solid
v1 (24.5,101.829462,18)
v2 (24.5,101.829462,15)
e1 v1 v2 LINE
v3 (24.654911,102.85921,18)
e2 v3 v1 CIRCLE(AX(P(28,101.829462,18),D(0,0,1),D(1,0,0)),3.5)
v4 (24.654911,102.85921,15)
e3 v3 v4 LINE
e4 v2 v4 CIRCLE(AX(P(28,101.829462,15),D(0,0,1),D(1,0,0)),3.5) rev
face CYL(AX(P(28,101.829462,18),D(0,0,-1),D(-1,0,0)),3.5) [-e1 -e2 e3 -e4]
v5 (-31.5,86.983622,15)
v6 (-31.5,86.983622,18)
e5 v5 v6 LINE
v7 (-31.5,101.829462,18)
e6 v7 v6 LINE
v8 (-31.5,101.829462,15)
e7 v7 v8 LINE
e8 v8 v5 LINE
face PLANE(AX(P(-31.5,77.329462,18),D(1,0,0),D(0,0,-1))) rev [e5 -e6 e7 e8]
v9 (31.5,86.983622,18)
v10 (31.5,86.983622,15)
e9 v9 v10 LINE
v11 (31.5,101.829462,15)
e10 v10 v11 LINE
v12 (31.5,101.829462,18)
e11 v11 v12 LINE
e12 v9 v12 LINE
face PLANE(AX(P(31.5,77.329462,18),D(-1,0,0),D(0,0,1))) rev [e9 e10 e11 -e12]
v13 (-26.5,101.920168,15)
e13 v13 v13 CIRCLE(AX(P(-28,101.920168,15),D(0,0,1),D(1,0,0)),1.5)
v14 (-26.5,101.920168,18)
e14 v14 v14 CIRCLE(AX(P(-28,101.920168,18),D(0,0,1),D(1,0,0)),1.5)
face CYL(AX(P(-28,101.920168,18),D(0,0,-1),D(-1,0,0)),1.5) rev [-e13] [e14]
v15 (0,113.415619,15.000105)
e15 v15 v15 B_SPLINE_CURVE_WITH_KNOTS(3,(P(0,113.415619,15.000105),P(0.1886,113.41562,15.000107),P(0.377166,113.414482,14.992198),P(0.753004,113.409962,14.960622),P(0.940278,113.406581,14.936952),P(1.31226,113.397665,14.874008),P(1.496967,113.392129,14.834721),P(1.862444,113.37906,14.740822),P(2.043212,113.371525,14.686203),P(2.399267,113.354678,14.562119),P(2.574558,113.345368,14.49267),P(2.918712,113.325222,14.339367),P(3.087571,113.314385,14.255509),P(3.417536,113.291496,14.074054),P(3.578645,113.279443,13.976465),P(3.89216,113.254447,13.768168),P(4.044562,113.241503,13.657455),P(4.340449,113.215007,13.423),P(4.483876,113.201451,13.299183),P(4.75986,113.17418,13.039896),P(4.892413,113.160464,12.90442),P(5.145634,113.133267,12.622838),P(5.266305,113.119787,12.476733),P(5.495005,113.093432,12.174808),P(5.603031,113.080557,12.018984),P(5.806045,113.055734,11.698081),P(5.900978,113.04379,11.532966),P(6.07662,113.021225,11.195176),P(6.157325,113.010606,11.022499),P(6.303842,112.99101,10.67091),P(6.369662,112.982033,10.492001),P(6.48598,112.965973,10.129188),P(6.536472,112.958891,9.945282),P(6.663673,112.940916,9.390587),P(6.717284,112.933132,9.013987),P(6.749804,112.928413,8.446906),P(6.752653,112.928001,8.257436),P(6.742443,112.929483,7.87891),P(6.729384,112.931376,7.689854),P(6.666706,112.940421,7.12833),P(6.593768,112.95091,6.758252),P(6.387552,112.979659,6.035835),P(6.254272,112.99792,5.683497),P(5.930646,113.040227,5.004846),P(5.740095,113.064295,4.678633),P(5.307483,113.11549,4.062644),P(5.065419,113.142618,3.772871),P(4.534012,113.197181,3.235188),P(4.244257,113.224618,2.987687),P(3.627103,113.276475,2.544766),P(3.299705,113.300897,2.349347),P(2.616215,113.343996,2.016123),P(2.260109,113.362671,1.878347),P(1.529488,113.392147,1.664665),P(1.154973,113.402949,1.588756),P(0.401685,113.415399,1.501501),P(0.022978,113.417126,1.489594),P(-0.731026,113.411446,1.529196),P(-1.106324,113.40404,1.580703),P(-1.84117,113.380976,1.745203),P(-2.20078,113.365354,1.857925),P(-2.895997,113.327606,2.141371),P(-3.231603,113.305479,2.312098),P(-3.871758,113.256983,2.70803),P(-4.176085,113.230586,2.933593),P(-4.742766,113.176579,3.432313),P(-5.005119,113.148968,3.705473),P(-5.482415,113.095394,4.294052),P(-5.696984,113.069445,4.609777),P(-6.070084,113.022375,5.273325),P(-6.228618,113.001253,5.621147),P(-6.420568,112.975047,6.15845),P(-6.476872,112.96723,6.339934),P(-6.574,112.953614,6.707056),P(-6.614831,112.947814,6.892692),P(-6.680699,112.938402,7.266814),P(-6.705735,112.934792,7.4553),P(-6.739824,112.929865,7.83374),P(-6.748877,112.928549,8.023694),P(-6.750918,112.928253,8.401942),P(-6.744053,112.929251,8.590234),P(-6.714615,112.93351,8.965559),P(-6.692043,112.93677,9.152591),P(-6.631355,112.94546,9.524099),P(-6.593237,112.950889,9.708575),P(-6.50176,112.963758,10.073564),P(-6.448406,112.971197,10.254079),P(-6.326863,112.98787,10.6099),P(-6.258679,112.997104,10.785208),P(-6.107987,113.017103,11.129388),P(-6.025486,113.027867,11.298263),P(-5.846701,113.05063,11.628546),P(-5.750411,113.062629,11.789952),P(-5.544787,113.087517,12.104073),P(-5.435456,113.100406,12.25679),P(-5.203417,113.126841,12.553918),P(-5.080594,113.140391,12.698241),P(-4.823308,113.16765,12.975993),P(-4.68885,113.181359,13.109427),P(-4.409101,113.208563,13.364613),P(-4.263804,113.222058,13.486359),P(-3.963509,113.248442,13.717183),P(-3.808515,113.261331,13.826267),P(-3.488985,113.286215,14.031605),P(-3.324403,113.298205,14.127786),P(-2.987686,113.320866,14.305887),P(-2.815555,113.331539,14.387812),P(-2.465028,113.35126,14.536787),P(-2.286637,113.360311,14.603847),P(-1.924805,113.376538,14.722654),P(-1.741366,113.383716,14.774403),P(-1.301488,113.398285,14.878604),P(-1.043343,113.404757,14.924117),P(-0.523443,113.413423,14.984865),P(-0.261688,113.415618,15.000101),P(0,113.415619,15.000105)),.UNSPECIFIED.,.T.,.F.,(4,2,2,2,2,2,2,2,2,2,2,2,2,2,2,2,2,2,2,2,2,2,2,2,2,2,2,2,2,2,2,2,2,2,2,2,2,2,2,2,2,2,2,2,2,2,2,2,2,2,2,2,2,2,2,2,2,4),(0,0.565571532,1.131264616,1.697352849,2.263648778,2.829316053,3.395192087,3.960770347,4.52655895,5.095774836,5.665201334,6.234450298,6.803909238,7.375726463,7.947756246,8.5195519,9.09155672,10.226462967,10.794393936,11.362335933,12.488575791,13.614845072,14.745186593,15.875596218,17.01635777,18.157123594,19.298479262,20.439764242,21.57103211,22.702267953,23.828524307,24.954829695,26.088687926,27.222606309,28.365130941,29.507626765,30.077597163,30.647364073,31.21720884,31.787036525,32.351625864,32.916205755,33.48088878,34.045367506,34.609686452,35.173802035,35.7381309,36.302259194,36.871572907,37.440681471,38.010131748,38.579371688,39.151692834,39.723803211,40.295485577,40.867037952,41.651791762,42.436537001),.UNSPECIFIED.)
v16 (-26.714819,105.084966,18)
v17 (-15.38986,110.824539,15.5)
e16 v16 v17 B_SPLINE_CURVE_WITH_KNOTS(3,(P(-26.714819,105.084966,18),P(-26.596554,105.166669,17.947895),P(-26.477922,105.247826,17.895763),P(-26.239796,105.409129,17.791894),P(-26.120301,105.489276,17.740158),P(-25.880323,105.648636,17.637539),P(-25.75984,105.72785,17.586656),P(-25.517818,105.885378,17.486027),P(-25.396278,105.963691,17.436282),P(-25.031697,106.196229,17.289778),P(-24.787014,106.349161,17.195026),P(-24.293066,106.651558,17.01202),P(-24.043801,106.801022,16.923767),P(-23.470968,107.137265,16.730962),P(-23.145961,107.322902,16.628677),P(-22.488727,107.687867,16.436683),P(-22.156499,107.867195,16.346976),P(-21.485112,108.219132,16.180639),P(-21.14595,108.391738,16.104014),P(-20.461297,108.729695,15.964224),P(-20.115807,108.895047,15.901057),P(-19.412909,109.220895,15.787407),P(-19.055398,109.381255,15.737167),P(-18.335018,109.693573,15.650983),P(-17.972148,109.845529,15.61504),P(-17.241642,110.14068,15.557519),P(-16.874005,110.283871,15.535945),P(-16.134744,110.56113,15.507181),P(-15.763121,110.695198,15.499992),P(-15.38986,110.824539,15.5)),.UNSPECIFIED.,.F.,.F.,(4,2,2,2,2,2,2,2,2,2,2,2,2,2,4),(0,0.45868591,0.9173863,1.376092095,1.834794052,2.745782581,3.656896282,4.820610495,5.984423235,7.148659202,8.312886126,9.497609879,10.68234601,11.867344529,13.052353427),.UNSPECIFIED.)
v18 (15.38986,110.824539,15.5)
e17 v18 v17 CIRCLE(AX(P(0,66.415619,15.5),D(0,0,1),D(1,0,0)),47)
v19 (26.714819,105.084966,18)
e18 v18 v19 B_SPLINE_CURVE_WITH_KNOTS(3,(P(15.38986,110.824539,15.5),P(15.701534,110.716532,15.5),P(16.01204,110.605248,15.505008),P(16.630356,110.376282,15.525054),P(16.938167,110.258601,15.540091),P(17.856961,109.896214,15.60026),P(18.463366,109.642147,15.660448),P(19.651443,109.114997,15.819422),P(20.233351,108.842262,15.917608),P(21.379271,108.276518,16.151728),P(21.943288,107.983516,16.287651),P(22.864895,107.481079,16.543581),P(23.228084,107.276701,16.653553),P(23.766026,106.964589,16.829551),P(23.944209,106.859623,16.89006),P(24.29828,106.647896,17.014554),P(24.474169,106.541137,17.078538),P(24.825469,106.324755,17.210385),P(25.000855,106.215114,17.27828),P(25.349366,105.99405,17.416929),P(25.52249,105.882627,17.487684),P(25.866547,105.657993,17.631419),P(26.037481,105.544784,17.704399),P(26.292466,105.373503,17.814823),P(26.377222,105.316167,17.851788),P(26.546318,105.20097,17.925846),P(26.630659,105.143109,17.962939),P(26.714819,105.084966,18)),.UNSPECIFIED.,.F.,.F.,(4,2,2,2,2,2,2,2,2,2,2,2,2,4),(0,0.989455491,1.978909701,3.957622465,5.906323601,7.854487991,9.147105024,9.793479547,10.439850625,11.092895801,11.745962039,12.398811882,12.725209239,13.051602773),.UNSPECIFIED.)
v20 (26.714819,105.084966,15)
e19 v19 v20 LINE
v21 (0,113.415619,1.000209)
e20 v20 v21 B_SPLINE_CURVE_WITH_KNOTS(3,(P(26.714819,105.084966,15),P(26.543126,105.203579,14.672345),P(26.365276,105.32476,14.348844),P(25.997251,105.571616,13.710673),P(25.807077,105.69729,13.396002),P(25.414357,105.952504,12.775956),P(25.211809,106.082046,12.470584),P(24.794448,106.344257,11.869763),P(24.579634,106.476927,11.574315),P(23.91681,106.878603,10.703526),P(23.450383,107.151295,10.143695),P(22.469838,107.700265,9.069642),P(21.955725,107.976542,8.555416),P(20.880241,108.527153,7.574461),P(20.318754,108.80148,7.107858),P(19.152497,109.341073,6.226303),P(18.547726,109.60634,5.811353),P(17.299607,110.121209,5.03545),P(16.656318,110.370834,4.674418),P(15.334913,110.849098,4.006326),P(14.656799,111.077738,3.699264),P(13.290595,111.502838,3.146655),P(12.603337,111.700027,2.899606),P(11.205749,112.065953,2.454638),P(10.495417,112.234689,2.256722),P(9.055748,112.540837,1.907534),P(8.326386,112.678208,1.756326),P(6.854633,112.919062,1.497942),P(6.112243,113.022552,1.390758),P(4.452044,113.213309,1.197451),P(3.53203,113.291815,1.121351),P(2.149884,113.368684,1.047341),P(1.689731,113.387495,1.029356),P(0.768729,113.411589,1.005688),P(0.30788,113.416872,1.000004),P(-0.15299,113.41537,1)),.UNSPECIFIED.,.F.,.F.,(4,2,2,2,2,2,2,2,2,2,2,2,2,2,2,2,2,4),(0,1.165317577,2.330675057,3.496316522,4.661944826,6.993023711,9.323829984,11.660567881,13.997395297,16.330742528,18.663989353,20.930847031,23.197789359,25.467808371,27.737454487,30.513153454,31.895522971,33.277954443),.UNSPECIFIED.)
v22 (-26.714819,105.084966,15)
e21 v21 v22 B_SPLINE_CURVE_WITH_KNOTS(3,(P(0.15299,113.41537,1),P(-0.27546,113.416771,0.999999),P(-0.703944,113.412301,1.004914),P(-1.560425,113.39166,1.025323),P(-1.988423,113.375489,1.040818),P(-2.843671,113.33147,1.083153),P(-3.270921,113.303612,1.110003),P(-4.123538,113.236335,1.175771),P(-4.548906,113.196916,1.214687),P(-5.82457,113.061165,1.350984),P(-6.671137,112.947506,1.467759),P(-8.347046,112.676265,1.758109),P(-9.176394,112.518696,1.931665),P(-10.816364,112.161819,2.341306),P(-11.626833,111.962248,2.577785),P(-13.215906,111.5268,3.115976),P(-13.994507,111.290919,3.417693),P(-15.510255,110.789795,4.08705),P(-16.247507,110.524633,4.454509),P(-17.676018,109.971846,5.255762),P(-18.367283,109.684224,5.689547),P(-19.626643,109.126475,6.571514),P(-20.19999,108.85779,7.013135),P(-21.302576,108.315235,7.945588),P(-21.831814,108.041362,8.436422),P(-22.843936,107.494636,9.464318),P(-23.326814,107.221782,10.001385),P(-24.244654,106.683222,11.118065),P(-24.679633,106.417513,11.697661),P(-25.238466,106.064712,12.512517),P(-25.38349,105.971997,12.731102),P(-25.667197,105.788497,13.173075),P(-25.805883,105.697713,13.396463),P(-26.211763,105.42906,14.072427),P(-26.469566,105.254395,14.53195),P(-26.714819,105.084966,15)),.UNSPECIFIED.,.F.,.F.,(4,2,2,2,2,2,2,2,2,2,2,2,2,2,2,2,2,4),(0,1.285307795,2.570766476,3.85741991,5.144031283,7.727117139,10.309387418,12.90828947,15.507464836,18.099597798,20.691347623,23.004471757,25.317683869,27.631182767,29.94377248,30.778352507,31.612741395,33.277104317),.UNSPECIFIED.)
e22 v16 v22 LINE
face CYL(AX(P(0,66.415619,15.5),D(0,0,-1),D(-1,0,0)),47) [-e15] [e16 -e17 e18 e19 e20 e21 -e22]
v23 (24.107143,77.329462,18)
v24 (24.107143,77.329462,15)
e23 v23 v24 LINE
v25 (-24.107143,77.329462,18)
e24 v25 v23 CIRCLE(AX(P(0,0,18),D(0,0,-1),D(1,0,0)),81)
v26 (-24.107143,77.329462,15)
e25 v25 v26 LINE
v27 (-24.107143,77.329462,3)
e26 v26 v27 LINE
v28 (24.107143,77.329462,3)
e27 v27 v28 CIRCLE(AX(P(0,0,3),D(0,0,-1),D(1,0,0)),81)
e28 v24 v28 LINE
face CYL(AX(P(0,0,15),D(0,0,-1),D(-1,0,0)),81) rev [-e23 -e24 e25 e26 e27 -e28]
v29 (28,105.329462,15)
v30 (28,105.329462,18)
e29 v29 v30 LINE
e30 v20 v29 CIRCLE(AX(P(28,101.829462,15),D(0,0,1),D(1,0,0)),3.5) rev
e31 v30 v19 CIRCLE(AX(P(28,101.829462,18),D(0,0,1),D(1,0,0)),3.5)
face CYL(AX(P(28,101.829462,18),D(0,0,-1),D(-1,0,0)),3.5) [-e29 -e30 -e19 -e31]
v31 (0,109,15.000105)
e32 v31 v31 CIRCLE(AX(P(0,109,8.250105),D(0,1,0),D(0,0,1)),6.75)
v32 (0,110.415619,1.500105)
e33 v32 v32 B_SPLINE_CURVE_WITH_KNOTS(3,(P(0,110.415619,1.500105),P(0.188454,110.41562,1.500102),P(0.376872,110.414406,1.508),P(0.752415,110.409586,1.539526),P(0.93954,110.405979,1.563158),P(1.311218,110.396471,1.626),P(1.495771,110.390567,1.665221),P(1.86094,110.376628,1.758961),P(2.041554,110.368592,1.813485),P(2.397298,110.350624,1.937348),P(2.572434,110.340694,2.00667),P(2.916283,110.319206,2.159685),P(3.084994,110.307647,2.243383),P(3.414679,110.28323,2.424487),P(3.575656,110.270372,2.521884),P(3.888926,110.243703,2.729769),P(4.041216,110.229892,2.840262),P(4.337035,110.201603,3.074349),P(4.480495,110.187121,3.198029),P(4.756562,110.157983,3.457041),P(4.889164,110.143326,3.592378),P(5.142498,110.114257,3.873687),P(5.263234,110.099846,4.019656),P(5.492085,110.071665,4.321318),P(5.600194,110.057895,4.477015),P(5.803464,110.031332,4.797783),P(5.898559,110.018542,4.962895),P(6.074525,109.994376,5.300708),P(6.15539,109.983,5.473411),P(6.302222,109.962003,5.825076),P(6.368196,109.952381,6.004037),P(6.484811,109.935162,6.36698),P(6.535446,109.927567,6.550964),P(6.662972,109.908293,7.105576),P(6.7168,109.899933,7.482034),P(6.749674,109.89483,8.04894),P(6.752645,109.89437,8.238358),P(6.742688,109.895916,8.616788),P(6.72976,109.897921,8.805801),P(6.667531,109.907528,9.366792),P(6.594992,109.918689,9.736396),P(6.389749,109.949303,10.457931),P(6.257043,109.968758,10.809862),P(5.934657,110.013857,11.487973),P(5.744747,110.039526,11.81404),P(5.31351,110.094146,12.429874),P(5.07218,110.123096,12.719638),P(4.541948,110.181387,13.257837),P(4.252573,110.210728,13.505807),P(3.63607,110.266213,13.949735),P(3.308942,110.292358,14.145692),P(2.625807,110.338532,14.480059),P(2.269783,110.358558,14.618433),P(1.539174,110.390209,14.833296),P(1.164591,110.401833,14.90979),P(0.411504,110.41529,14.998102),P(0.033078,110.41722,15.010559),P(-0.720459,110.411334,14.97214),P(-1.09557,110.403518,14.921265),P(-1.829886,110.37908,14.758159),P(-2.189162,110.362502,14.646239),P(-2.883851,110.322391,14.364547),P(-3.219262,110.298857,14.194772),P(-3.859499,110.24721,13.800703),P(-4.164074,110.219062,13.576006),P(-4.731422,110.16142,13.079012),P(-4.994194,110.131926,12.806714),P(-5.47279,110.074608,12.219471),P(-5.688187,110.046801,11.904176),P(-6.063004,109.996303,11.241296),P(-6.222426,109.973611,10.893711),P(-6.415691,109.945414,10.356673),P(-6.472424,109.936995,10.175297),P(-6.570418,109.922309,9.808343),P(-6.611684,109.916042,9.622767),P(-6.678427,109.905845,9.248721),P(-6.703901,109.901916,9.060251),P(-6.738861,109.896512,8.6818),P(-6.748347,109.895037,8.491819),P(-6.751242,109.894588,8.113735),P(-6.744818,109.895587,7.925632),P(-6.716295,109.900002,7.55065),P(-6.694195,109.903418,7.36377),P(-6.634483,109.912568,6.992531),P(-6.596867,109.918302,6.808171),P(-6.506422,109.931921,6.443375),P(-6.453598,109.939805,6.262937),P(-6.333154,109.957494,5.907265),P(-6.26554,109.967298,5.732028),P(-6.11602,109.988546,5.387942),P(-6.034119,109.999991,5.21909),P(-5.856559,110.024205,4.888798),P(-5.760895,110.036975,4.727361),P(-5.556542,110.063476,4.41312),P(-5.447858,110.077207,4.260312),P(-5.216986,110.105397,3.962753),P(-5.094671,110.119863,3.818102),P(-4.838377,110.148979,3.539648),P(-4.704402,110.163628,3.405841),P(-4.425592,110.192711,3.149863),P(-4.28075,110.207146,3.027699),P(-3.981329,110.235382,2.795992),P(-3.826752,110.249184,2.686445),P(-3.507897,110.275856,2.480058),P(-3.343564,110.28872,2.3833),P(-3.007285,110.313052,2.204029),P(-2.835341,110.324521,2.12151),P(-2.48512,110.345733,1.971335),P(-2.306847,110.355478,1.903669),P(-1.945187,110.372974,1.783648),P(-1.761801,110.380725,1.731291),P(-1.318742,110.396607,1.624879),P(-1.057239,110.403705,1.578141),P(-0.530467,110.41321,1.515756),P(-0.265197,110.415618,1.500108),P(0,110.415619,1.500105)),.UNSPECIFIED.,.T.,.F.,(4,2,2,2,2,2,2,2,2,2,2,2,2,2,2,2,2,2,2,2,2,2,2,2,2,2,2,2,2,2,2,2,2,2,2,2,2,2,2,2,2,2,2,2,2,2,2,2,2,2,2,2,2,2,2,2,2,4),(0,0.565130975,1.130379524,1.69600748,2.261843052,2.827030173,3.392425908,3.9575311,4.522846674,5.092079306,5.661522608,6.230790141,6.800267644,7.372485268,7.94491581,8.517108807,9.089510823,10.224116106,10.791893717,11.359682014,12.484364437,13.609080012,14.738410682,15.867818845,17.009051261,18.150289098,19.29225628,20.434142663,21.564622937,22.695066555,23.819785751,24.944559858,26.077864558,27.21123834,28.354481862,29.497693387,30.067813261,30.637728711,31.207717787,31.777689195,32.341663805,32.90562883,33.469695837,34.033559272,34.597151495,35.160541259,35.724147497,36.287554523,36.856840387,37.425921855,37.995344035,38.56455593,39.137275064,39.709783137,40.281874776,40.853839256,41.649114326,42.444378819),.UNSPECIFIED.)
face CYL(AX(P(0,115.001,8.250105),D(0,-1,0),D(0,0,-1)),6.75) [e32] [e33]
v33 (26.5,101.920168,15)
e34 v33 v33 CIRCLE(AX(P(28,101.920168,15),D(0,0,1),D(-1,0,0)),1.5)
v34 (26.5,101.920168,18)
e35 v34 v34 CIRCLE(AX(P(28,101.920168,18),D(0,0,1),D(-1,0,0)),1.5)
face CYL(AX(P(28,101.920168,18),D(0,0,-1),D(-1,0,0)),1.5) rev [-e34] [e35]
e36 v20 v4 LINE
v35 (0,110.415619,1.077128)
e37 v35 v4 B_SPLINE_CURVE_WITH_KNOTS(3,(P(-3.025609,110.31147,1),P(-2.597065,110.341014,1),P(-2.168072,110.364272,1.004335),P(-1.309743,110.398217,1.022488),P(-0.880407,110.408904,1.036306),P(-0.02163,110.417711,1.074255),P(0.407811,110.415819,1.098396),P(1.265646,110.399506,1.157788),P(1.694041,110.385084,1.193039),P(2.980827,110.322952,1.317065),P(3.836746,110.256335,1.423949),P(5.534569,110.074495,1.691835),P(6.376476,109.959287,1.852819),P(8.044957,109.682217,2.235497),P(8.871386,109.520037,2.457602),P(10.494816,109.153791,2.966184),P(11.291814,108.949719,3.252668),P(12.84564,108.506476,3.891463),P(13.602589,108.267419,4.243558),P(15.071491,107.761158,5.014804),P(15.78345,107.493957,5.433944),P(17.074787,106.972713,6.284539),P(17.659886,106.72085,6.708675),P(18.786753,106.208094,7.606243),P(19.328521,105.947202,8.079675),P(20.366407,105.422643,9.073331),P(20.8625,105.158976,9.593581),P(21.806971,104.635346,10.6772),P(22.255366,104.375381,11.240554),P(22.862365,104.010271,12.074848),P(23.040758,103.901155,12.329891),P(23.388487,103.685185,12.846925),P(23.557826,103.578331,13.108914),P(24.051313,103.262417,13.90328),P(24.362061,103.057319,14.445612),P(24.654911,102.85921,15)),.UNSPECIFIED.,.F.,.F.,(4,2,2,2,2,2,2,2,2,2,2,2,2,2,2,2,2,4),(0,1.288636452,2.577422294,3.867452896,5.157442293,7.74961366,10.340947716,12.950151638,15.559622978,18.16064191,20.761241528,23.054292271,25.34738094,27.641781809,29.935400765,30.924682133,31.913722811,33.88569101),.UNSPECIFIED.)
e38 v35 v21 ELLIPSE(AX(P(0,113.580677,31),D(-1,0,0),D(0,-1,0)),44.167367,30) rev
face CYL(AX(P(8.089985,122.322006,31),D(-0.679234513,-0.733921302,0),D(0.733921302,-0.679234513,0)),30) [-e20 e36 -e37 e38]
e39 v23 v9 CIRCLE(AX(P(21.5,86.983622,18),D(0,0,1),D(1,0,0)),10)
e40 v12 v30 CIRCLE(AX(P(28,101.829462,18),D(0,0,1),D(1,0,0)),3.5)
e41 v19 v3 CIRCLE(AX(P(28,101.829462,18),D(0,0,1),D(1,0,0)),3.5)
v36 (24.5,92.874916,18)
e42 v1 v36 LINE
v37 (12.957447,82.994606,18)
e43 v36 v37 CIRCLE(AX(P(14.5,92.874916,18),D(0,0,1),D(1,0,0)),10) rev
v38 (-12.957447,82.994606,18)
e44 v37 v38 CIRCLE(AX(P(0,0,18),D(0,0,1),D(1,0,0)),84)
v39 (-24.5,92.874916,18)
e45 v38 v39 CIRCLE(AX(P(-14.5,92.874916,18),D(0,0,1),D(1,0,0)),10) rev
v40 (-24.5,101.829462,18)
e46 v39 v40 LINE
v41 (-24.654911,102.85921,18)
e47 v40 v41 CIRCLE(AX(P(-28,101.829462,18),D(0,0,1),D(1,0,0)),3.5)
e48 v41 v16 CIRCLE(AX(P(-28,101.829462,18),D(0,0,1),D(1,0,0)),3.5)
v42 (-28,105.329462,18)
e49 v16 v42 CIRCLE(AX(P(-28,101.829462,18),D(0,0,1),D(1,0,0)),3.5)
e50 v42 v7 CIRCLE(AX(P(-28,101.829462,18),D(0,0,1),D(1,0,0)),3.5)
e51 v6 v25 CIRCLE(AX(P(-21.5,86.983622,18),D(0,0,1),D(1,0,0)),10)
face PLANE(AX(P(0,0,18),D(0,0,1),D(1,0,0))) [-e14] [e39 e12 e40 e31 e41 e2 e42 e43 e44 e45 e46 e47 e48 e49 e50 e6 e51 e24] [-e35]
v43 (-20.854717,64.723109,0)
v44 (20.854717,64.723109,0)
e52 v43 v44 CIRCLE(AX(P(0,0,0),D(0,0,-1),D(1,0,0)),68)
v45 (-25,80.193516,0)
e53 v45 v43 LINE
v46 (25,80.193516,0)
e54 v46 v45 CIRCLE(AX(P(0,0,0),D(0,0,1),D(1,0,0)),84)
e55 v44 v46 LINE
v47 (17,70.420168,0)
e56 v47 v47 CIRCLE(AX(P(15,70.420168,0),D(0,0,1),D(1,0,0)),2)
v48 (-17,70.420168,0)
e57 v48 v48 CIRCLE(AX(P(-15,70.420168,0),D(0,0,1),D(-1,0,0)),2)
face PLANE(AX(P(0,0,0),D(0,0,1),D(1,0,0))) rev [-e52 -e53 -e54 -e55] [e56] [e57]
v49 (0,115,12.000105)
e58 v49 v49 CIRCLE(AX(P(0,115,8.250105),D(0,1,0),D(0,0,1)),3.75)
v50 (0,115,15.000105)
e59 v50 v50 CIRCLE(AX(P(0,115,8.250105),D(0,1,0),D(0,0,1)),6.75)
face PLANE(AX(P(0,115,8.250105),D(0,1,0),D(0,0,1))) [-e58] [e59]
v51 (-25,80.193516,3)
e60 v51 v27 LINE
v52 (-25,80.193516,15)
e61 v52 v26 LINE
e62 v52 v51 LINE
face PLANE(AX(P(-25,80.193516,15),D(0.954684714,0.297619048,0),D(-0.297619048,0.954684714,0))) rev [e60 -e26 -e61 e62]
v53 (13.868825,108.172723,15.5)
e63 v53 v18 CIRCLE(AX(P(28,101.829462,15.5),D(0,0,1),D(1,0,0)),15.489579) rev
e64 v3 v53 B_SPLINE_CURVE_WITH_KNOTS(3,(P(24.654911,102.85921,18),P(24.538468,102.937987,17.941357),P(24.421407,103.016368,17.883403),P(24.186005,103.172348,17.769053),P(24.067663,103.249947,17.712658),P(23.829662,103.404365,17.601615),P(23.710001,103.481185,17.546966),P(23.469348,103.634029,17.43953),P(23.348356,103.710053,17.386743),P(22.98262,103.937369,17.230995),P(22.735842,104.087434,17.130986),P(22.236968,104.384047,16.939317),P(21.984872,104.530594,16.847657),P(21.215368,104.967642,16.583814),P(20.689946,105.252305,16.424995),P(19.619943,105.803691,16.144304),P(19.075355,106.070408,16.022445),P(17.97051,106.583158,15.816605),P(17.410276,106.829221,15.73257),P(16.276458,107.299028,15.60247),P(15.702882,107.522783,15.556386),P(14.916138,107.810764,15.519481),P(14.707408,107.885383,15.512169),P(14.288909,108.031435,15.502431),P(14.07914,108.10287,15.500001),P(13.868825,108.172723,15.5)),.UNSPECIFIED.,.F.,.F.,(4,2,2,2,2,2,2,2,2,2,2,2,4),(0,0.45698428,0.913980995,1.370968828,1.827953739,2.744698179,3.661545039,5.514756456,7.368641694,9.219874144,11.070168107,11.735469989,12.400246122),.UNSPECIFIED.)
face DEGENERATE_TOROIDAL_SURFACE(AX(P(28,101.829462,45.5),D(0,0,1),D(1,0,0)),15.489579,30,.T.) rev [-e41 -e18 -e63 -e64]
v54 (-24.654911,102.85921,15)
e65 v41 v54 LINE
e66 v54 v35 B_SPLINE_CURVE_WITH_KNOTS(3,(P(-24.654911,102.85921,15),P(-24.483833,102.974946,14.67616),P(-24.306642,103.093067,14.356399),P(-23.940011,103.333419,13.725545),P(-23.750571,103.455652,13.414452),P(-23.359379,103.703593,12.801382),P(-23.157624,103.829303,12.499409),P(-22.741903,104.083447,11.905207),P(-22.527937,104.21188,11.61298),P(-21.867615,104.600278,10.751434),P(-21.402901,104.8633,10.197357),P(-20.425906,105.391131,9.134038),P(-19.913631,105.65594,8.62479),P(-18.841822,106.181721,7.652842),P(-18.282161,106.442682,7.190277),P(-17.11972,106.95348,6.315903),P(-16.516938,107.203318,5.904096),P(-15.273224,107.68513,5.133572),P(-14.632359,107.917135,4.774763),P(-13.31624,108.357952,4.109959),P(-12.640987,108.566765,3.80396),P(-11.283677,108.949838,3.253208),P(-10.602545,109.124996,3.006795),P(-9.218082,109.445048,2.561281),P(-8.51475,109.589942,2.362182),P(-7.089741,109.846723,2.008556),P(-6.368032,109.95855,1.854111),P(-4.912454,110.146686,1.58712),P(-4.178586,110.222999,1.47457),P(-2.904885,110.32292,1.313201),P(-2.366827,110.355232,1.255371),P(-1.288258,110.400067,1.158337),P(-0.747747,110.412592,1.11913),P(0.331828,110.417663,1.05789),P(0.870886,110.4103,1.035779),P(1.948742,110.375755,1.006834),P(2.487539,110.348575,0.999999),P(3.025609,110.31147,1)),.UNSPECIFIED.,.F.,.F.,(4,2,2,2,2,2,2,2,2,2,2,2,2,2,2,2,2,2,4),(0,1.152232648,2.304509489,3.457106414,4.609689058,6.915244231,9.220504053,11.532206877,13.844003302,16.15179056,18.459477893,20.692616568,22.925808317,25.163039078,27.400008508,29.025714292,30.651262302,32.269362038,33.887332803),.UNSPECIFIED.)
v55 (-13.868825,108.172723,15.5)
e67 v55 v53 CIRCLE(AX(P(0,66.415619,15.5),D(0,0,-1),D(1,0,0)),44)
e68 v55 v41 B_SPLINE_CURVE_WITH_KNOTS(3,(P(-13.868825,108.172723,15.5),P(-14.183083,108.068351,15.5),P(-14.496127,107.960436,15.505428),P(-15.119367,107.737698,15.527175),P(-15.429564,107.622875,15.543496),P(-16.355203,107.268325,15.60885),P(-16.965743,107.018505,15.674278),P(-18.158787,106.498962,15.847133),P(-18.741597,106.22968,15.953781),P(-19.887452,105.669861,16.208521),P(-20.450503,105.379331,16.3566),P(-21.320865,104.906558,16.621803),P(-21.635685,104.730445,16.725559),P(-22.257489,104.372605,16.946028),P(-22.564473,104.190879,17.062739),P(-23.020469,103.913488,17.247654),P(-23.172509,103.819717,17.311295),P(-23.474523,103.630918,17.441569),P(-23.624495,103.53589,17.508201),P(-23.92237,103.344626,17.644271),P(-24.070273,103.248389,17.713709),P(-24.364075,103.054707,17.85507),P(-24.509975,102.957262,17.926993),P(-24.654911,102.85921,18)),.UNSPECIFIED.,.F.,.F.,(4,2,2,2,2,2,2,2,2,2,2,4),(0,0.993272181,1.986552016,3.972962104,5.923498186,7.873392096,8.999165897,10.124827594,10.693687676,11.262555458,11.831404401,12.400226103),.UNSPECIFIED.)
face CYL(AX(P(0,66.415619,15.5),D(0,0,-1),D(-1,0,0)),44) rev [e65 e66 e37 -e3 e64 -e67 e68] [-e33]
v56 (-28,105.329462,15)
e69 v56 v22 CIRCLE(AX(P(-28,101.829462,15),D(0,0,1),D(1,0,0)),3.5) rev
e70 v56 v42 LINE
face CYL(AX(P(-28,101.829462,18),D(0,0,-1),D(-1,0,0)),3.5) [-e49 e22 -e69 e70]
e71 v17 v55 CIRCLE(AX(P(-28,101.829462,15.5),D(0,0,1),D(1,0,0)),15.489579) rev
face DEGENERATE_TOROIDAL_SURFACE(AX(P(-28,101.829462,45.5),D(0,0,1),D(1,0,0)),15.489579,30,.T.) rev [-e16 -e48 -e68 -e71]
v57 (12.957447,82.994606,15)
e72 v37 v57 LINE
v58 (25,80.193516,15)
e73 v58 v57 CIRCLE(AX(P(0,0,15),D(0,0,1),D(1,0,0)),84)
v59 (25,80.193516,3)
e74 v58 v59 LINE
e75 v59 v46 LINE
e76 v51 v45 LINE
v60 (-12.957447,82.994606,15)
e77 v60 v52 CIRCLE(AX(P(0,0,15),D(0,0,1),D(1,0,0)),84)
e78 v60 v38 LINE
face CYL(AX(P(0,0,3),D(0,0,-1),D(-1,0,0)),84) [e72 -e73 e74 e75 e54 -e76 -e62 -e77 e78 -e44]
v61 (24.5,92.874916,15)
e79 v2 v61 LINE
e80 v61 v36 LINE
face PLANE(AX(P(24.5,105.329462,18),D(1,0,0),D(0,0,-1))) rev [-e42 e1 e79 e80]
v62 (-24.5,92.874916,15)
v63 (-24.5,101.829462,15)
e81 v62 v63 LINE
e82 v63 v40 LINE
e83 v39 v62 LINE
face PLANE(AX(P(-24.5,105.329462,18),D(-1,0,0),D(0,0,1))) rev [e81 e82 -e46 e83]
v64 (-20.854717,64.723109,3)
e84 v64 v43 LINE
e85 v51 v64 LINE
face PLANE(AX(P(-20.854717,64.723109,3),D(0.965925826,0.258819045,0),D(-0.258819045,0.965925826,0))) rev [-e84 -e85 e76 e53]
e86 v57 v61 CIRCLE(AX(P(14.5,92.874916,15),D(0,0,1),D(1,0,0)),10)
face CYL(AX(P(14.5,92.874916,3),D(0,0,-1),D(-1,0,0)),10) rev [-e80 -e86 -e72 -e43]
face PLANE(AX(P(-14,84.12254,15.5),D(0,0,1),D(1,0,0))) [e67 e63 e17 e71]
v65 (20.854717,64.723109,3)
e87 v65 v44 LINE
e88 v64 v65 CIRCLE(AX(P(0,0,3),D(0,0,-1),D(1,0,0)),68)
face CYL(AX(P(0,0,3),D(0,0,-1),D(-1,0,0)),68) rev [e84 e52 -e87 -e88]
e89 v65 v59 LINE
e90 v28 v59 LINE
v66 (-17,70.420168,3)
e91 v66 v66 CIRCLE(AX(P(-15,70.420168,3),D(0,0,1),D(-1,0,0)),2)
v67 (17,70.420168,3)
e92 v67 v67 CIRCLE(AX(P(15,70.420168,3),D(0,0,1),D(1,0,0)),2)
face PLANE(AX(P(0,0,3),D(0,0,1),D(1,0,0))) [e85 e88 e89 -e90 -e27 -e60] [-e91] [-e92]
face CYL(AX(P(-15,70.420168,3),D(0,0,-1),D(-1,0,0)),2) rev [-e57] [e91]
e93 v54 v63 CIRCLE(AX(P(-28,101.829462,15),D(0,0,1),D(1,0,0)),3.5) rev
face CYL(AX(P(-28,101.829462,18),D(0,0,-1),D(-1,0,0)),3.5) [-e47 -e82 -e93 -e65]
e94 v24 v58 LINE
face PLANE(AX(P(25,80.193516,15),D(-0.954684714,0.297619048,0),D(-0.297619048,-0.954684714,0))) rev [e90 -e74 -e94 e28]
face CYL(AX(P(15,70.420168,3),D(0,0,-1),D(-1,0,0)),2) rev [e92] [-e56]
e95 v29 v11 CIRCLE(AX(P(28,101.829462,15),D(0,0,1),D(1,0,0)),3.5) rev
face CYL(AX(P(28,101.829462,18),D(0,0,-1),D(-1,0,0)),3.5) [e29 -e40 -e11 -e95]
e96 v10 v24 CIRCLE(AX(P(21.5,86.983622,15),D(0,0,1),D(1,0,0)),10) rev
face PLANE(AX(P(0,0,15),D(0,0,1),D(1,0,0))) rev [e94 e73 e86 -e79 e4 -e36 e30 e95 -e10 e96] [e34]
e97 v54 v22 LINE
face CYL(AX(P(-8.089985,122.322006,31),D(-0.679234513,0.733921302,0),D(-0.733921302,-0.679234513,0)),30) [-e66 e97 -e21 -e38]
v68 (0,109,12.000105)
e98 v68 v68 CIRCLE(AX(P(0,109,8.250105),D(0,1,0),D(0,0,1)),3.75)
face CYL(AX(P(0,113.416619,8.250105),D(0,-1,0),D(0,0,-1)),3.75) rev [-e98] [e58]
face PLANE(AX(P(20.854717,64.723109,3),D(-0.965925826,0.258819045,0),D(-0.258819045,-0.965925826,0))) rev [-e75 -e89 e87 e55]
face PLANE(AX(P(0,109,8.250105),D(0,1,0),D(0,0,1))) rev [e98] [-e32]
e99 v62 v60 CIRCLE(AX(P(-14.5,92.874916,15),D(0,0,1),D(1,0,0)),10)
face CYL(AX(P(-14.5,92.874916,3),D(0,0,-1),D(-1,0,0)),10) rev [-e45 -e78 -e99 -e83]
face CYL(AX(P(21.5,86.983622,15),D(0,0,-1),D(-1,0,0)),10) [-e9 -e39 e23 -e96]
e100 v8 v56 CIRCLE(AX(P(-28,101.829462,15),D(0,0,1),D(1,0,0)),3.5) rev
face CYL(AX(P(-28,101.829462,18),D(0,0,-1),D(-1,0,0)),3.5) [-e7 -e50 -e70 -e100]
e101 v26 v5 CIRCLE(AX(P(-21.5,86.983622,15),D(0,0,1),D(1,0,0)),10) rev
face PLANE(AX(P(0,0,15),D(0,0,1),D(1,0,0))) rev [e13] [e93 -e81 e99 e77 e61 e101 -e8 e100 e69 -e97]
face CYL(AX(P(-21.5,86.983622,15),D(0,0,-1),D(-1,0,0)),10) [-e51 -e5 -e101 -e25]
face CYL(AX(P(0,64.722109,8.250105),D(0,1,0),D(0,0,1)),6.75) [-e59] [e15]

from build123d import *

# Parameters (mm, degrees)
SKETCH1_R                 = 2
BOSS_EXTRUDE1_DEPTH       = 3
BOSS_EXTRUDE2_DEPTH       = 12
SKETCH3_R                 = 1.5
BOSS_EXTRUDE3_DEPTH       = 3
FILLET1_R                 = 10
FILLET3_R                 = 3.5
BOSS_EXTRUDE6_DEPTH       = 14
BOSS_EXTRUDE7_DEPTH       = 0.5
BOSS_EXTRUDE8_START       = -14
BOSS_EXTRUDE8_DEPTH       = 14
FILLET7_R                 = 30
FILLET11_R                = 30
CUT_EXTRUDE3_REACH        = 52.603
CUT_EXTRUDE3_END_RADIUS   = 47
SKETCH12_R                = 3.75
BOSS_EXTRUDE9_REACH       = 64
BOSS_EXTRUDE9_END_RADIUS  = 47
SKETCH13_R                = 6.75
SKETCH13_R_2              = 3.75
BOSS_EXTRUDE10_REACH      = 59.242
BOSS_EXTRUDE10_END_RADIUS = 44
SKETCH14_R                = 6.75
SKETCH14_R_2              = 3.75


# Some blends are built 0.0001 mm under size
with BuildPart() as part:
    # Sketch1 → Boss-Extrude1 (new body)
    with BuildSketch(Plane.XY):
        with BuildLine():
            Line((20.854716842, 64.723108589), (25, 80.193515947))
            ThreePointArc((25, 80.193515947), (0, 84), (-25, 80.193515947))
            Line((-25, 80.193515947), (-20.854716842, 64.723108589))
            ThreePointArc((-20.854716842, 64.723108589), (0, 68), (20.854716842, 64.723108589))
        make_face()
        with Locations((15, 70.420167566)):
            Circle(SKETCH1_R, mode=Mode.SUBTRACT)
        with Locations(Location((-15, 70.420167566, 0), (0, 0, 180))):
            Circle(SKETCH1_R, mode=Mode.SUBTRACT)
    extrude(amount=BOSS_EXTRUDE1_DEPTH)

    # Sketch2 → Boss-Extrude2 (add)
    with BuildSketch(Plane.XY.offset(3)):
        with BuildLine():
            Line((-25, 80.193515947), (-24.107142857, 77.329461806))
            ThreePointArc((-24.107142857, 77.329461806), (0, 81), (24.107142857, 77.329461806))
            Line((24.107142857, 77.329461806), (25, 80.193515947))
            ThreePointArc((25, 80.193515947), (0, 84), (-25, 80.193515947))
        make_face()
    extrude(amount=BOSS_EXTRUDE2_DEPTH)

    # Sketch3 → Boss-Extrude3 (add)
    with BuildSketch(Plane.XY.offset(15)):
        with BuildLine():
            Line((-31.5, 77.329461806), (-31.5, 105.329461806))
            Line((-31.5, 105.329461806), (-24.5, 105.329461806))
            Line((-24.5, 105.329461806), (-24.5, 80.347681983))
            ThreePointArc((-24.5, 80.347681983), (0, 84), (24.5, 80.347681983))
            Line((24.5, 80.347681983), (24.5, 105.329461806))
            Line((24.5, 105.329461806), (31.5, 105.329461806))
            Line((31.5, 105.329461806), (31.5, 77.329461806))
            Line((31.5, 77.329461806), (24.107142857, 77.329461806))
            ThreePointArc((24.107142857, 77.329461806), (0, 81), (-24.107142857, 77.329461806))
            Line((-24.107142857, 77.329461806), (-31.5, 77.329461806))
        make_face()
        with Locations((-28, 101.920167566)):
            Circle(SKETCH3_R, mode=Mode.SUBTRACT)
        with Locations(Location((28, 101.920167566, 0), (0, 0, 180))):
            Circle(SKETCH3_R, mode=Mode.SUBTRACT)
    extrude(amount=BOSS_EXTRUDE3_DEPTH)

    # Fillet1
    # the kernel refuses this fillet: 10 mm, written as the material it adds along each edge
    with BuildSketch(Plane(origin=(24.5, 80.347681983, 15), x_dir=(-0.9747000358663407, 0.22351697940459464, 0), z_dir=(0, 0, 1))) as fillet1_piece_1:
        with BuildLine():
            CenterArc((12.54704984, -9.975125536), FILLET1_R, 94.042076765, 98.87360977)
            Line((2.800049481, -12.21029533), (0, 0))
            ThreePointArc((0, 0), (5.9210797, -0.208945494), (11.8421594, 0))
        make_face()
    extrude(amount=3)
    with BuildSketch(Plane(origin=(-24.5, 80.347681983, 15), x_dir=(0.9747000358663402, 0.22351697940459697, 0), z_dir=(0, 0, 1))) as fillet1_piece_2:
        with BuildLine():
            CenterArc((12.54704984, 9.975125536), FILLET1_R, 167.084313465, 98.87360977)
            Line((2.800049481, 12.21029533), (0, 0))
            ThreePointArc((0, 0), (5.9210797, 0.208945494), (11.8421594, 0))
        make_face()
    extrude(amount=3)
    # the kernel refuses this fillet: 10 mm, written as the material it takes off along each edge
    with BuildSketch(Plane(origin=(31.5, 77.329461806, 15), x_dir=(0, 1, 0), z_dir=(0, 0, 1))) as fillet1_2_piece_1:
        with BuildLine():
            CenterArc((9.654160042, 10), FILLET1_R, 195.112449543, 74.887550457)
            Line((0, 7.392857143), (0, 0))
            Line((0, 0), (9.654160042, 0))
        make_face()
    extrude(amount=27.135400106, mode=Mode.SUBTRACT)
    with BuildSketch(Plane(origin=(-31.5, 77.329461806, 15), x_dir=(0, 1, 0), z_dir=(0, 0, 1))) as fillet1_2_piece_2:
        with BuildLine():
            CenterArc((9.654160042, -10), FILLET1_R, 90, 74.887550457)
            Line((0, -7.392857143), (0, 0))
            Line((0, 0), (9.654160042, 0))
        make_face()
    extrude(amount=27.135400106, mode=Mode.SUBTRACT)

    # Fillet3
    fillet3_edges = [part.edges().sort_by_distance(p)[0] for p in [
        (31.5, 105.329461806, 16.5),
        (24.5, 105.329461806, 16.5),
        (-24.5, 105.329461806, 16.5),
        (-31.5, 105.329461806, 16.5),
    ]]
    fillet(fillet3_edges, radius=FILLET3_R - 0.0001)  # a hair under: the kernel refuses the full size



with BuildPart() as body_2:
    # Sketch9 → Boss-Extrude6 (new body)
    with BuildSketch(Plane(origin=(0, 0, 15), x_dir=(-1, 0, 0), z_dir=(0, 0, -1))):
        with BuildLine():
            ThreePointArc((24.654911386, 102.8592104), (0, 110.415619131), (-24.654911386, 102.8592104))
            ThreePointArc((-24.654911386, 102.8592104), (-25.431275444, 104.2067826), (-26.71481938, 105.084966494))
            ThreePointArc((-26.71481938, 105.084966494), (0, 113.415619131), (26.71481938, 105.084966494))
            ThreePointArc((26.71481938, 105.084966494), (25.431275444, 104.2067826), (24.654911386, 102.8592104))
        make_face()
    extrude(amount=BOSS_EXTRUDE6_DEPTH)


with BuildPart() as part_1:
    add(part.part)

    add(body_2.part)  # Boss-Extrude7 merges body 2
    # Sketch10 → Boss-Extrude7 (add)
    with BuildSketch(Plane.XY.offset(15)):
        with BuildLine():
            ThreePointArc((-24.654911386, 102.8592104), (-25.431275444, 104.2067826), (-26.71481938, 105.084966494))
            ThreePointArc((-26.71481938, 105.084966494), (0, 113.415619131), (26.71481938, 105.084966494))
            ThreePointArc((26.71481938, 105.084966494), (25.431275444, 104.2067826), (24.654911386, 102.8592104))
            ThreePointArc((24.654911386, 102.8592104), (0, 110.415619131), (-24.654911386, 102.8592104))
        make_face()
    extrude(amount=BOSS_EXTRUDE7_DEPTH)

    # Sketch11 → Boss-Extrude8 (add)
    with BuildSketch(Plane(origin=(0, 0, 1), x_dir=(-1, 0, 0), z_dir=(0, 0, -1)).offset(BOSS_EXTRUDE8_START)):
        with BuildLine():
            Line((-26.71481938, 105.084966494), (-24.654911386, 102.8592104))
            ThreePointArc((-24.654911386, 102.8592104), (-25.431275444, 104.2067826), (-26.71481938, 105.084966494))
        make_face()
        with BuildLine():
            Line((26.71481938, 105.084966494), (24.654911386, 102.8592104))
            ThreePointArc((24.654911386, 102.8592104), (25.431275444, 104.2067826), (26.71481938, 105.084966494))
        make_face()
    extrude(amount=BOSS_EXTRUDE8_DEPTH)

    # Fillet7
    # the kernel refuses this fillet: 30 mm, written as the material it takes off along each edge
    with BuildSketch(Plane(origin=(69.80741828, 151.647053217, 1), x_dir=(-0.7339213016528682, 0.6792345125066597, 0), z_dir=(-0.6792345125066598, -0.7339213016528682, 0))) as fillet7_piece_1_section:
        with BuildLine():
            CenterArc((25.377155081, -30), FILLET7_R, 90, 57.769047365)
            Line((0, -14), (0, 0))
            Line((0, 0), (25.377155081, 0))
        make_face()
    fillet7_piece_1 = extrude(amount=129.918465817, mode=Mode.PRIVATE)
    fillet7_piece_1 = fillet7_piece_1 - Plane(origin=(0, 0, 1), x_dir=(0.2976190476190481, 0.9546847136590859, 0), z_dir=(0, 0, -1)) * Cylinder(84, 362, mode=Mode.PRIVATE)
    add(fillet7_piece_1, mode=Mode.SUBTRACT)
    with BuildSketch(Plane(origin=(-69.80741828, 151.647053217, 1), x_dir=(0, 0, 1), z_dir=(0.6792345125066636, -0.7339213016528646, 0))) as fillet7_piece_2_section:
        with BuildLine():
            CenterArc((30, -25.377155081), FILLET7_R, 122.230952636, 57.769047365)
            Line((0, -25.377155081), (0, 0))
            Line((0, 0), (14, 0))
        make_face()
    fillet7_piece_2 = extrude(amount=129.918465817, mode=Mode.PRIVATE)
    fillet7_piece_2 = fillet7_piece_2 - Plane(origin=(0, 0, 1), x_dir=(0.2976190476190481, 0.9546847136590859, 0), z_dir=(0, 0, -1)) * Cylinder(84, 362, mode=Mode.PRIVATE)
    add(fillet7_piece_2, mode=Mode.SUBTRACT)

    # Fillet11
    # the kernel refuses this fillet: 30 mm, written as the material it adds along each edge
    with BuildSketch(Plane(origin=(27.9999, 101.829561806, 15.5), x_dir=(0.5609336863803128, 0.8278607367690491, 0), z_dir=(0.8278607367690491, -0.5609336863803128, 0))) as fillet11_piece_1_section:
        with BuildLine():
            CenterArc((15.489478808, 30), FILLET11_R, 246.443535691, 23.556464309)
            Line((3.4999, 2.5), (3.4999, 0))
            Line((3.4999, 0), (15.489478808, 0))
        make_face()
    fillet11_piece_1 = revolve(axis=Axis((27.9999, 101.829561806, 15.5), (0, 0, 1)), revolution_arc=359.64, mode=Mode.PRIVATE)
    fillet11_piece_1 = fillet11_piece_1 & Plane(origin=(0, 66.415619131, 15.5), x_dir=(0.5684004123362708, 0.8227520715598091, 0), z_dir=(0, 0, 1)) * Cylinder(47, 62, mode=Mode.PRIVATE)
    fillet11_piece_1 = fillet11_piece_1 - Plane(origin=(0, 66.415619131, 15.5), x_dir=(-0.5603388951384309, 0.8282634379199909, 0), z_dir=(0, 0, 1)) * Cylinder(44, 62, mode=Mode.PRIVATE)
    fillet11_piece_1 = split(fillet11_piece_1, bisect_by=Plane(origin=(31.5, 101.829561806, 15.5), z_dir=(-1, 0, 0)), keep=Keep.TOP, mode=Mode.PRIVATE)
    add(fillet11_piece_1)
    with BuildSketch(Plane(origin=(-27.9999, 101.829561806, 15.5), x_dir=(-0.5661241822221539, 0.8243199684001945, 0), z_dir=(0.8243199684001945, 0.5661241822221539, 0))) as fillet11_piece_2_section:
        with BuildLine():
            CenterArc((15.489478808, 30), FILLET11_R, 246.443535691, 23.556464309)
            Line((3.4999, 2.5), (3.4999, 0))
            Line((3.4999, 0), (15.489478808, 0))
        make_face()
    fillet11_piece_2 = revolve(axis=Axis((-27.9999, 101.829561806, 15.5), (0, 0, 1)), revolution_arc=359.64, mode=Mode.PRIVATE)
    fillet11_piece_2 = fillet11_piece_2 & Plane(origin=(0, 66.415619131, 15.5), x_dir=(0.5684004123362708, 0.8227520715598091, 0), z_dir=(0, 0, 1)) * Cylinder(47, 62, mode=Mode.PRIVATE)
    fillet11_piece_2 = fillet11_piece_2 - Plane(origin=(0, 66.415619131, 15.5), x_dir=(-0.5603388951384309, 0.8282634379199909, 0), z_dir=(0, 0, 1)) * Cylinder(44, 62, mode=Mode.PRIVATE)
    fillet11_piece_2 = split(fillet11_piece_2, bisect_by=Plane(origin=(-31.5, 101.829561806, 15.5), z_dir=(1, 0, 0)), keep=Keep.TOP, mode=Mode.PRIVATE)
    add(fillet11_piece_2)

    # Cut-Extrude3: up to this cylinder (the profile starts inside it)
    cut_extrude3_end = Plane(origin=(0, 66.415619131, 8.250105), z_dir=(0, 0, -1)) * Cylinder(CUT_EXTRUDE3_END_RADIUS, 200.206, mode=Mode.PRIVATE)
    # Sketch12 → Cut-Extrude3 (cut, up to the surface)
    with BuildSketch(Plane(origin=(0, 100, 0), x_dir=(1, 0, 0), z_dir=(0, 1, 0)), mode=Mode.PRIVATE) as cut_extrude3_sk1:
        with Locations(Location((0, -8.250104745, 0), (0, 0, 90))):
            Circle(SKETCH12_R)
    cut_extrude3_tool1 = extrude(cut_extrude3_sk1.sketch, amount=CUT_EXTRUDE3_REACH, mode=Mode.PRIVATE) & cut_extrude3_end
    add(cut_extrude3_tool1.solids().sort_by_distance((0, 100, 8.250105))[0], mode=Mode.SUBTRACT)

    # Boss-Extrude9: up to this cylinder (the profile starts outside it)
    boss_extrude9_end = Plane(origin=(0, 66.415619131, 1.691024), z_dir=(0, 0, -1)) * Cylinder(BOSS_EXTRUDE9_END_RADIUS, 223, mode=Mode.PRIVATE)
    # Sketch13 → Boss-Extrude9 (add, up to the surface)
    with BuildSketch(Plane(origin=(0, 115, 0), x_dir=(1, 0, 0), z_dir=(0, 1, 0)), mode=Mode.PRIVATE) as boss_extrude9_sk1:
        with Locations(Location((0, -8.250104745, 0), (0, 0, 270))):
            Circle(SKETCH13_R)
        with Locations(Location((0, -8.250104745, 0), (0, 0, 90))):
            Circle(SKETCH13_R_2, mode=Mode.SUBTRACT)
    boss_extrude9_tool1 = extrude(boss_extrude9_sk1.sketch, amount=-BOSS_EXTRUDE9_REACH, mode=Mode.PRIVATE) - boss_extrude9_end
    add(boss_extrude9_tool1.solids().sort_by_distance((0, 115, 1.691024))[0])

    # Boss-Extrude10: up to this cylinder (the profile starts inside it)
    boss_extrude10_end = Plane(origin=(0, 66.415619131, 1.691024), z_dir=(0, 0, -1)) * Cylinder(BOSS_EXTRUDE10_END_RADIUS, 207.484, mode=Mode.PRIVATE)
    # Sketch14 → Boss-Extrude10 (add, up to the surface)
    with BuildSketch(Plane(origin=(0, 109, 0), x_dir=(1, 0, 0), z_dir=(0, 1, 0)), mode=Mode.PRIVATE) as boss_extrude10_sk1:
        with Locations(Location((0, -8.250104745, 0), (0, 0, 270))):
            Circle(SKETCH14_R)
        with Locations(Location((0, -8.250104745, 0), (0, 0, 270))):
            Circle(SKETCH14_R_2, mode=Mode.SUBTRACT)
    boss_extrude10_tool1 = extrude(boss_extrude10_sk1.sketch, amount=BOSS_EXTRUDE10_REACH, mode=Mode.PRIVATE) & boss_extrude10_end
    add(boss_extrude10_tool1.solids().sort_by_distance((0, 109, 1.691024))[0])


solid = part_1.part
